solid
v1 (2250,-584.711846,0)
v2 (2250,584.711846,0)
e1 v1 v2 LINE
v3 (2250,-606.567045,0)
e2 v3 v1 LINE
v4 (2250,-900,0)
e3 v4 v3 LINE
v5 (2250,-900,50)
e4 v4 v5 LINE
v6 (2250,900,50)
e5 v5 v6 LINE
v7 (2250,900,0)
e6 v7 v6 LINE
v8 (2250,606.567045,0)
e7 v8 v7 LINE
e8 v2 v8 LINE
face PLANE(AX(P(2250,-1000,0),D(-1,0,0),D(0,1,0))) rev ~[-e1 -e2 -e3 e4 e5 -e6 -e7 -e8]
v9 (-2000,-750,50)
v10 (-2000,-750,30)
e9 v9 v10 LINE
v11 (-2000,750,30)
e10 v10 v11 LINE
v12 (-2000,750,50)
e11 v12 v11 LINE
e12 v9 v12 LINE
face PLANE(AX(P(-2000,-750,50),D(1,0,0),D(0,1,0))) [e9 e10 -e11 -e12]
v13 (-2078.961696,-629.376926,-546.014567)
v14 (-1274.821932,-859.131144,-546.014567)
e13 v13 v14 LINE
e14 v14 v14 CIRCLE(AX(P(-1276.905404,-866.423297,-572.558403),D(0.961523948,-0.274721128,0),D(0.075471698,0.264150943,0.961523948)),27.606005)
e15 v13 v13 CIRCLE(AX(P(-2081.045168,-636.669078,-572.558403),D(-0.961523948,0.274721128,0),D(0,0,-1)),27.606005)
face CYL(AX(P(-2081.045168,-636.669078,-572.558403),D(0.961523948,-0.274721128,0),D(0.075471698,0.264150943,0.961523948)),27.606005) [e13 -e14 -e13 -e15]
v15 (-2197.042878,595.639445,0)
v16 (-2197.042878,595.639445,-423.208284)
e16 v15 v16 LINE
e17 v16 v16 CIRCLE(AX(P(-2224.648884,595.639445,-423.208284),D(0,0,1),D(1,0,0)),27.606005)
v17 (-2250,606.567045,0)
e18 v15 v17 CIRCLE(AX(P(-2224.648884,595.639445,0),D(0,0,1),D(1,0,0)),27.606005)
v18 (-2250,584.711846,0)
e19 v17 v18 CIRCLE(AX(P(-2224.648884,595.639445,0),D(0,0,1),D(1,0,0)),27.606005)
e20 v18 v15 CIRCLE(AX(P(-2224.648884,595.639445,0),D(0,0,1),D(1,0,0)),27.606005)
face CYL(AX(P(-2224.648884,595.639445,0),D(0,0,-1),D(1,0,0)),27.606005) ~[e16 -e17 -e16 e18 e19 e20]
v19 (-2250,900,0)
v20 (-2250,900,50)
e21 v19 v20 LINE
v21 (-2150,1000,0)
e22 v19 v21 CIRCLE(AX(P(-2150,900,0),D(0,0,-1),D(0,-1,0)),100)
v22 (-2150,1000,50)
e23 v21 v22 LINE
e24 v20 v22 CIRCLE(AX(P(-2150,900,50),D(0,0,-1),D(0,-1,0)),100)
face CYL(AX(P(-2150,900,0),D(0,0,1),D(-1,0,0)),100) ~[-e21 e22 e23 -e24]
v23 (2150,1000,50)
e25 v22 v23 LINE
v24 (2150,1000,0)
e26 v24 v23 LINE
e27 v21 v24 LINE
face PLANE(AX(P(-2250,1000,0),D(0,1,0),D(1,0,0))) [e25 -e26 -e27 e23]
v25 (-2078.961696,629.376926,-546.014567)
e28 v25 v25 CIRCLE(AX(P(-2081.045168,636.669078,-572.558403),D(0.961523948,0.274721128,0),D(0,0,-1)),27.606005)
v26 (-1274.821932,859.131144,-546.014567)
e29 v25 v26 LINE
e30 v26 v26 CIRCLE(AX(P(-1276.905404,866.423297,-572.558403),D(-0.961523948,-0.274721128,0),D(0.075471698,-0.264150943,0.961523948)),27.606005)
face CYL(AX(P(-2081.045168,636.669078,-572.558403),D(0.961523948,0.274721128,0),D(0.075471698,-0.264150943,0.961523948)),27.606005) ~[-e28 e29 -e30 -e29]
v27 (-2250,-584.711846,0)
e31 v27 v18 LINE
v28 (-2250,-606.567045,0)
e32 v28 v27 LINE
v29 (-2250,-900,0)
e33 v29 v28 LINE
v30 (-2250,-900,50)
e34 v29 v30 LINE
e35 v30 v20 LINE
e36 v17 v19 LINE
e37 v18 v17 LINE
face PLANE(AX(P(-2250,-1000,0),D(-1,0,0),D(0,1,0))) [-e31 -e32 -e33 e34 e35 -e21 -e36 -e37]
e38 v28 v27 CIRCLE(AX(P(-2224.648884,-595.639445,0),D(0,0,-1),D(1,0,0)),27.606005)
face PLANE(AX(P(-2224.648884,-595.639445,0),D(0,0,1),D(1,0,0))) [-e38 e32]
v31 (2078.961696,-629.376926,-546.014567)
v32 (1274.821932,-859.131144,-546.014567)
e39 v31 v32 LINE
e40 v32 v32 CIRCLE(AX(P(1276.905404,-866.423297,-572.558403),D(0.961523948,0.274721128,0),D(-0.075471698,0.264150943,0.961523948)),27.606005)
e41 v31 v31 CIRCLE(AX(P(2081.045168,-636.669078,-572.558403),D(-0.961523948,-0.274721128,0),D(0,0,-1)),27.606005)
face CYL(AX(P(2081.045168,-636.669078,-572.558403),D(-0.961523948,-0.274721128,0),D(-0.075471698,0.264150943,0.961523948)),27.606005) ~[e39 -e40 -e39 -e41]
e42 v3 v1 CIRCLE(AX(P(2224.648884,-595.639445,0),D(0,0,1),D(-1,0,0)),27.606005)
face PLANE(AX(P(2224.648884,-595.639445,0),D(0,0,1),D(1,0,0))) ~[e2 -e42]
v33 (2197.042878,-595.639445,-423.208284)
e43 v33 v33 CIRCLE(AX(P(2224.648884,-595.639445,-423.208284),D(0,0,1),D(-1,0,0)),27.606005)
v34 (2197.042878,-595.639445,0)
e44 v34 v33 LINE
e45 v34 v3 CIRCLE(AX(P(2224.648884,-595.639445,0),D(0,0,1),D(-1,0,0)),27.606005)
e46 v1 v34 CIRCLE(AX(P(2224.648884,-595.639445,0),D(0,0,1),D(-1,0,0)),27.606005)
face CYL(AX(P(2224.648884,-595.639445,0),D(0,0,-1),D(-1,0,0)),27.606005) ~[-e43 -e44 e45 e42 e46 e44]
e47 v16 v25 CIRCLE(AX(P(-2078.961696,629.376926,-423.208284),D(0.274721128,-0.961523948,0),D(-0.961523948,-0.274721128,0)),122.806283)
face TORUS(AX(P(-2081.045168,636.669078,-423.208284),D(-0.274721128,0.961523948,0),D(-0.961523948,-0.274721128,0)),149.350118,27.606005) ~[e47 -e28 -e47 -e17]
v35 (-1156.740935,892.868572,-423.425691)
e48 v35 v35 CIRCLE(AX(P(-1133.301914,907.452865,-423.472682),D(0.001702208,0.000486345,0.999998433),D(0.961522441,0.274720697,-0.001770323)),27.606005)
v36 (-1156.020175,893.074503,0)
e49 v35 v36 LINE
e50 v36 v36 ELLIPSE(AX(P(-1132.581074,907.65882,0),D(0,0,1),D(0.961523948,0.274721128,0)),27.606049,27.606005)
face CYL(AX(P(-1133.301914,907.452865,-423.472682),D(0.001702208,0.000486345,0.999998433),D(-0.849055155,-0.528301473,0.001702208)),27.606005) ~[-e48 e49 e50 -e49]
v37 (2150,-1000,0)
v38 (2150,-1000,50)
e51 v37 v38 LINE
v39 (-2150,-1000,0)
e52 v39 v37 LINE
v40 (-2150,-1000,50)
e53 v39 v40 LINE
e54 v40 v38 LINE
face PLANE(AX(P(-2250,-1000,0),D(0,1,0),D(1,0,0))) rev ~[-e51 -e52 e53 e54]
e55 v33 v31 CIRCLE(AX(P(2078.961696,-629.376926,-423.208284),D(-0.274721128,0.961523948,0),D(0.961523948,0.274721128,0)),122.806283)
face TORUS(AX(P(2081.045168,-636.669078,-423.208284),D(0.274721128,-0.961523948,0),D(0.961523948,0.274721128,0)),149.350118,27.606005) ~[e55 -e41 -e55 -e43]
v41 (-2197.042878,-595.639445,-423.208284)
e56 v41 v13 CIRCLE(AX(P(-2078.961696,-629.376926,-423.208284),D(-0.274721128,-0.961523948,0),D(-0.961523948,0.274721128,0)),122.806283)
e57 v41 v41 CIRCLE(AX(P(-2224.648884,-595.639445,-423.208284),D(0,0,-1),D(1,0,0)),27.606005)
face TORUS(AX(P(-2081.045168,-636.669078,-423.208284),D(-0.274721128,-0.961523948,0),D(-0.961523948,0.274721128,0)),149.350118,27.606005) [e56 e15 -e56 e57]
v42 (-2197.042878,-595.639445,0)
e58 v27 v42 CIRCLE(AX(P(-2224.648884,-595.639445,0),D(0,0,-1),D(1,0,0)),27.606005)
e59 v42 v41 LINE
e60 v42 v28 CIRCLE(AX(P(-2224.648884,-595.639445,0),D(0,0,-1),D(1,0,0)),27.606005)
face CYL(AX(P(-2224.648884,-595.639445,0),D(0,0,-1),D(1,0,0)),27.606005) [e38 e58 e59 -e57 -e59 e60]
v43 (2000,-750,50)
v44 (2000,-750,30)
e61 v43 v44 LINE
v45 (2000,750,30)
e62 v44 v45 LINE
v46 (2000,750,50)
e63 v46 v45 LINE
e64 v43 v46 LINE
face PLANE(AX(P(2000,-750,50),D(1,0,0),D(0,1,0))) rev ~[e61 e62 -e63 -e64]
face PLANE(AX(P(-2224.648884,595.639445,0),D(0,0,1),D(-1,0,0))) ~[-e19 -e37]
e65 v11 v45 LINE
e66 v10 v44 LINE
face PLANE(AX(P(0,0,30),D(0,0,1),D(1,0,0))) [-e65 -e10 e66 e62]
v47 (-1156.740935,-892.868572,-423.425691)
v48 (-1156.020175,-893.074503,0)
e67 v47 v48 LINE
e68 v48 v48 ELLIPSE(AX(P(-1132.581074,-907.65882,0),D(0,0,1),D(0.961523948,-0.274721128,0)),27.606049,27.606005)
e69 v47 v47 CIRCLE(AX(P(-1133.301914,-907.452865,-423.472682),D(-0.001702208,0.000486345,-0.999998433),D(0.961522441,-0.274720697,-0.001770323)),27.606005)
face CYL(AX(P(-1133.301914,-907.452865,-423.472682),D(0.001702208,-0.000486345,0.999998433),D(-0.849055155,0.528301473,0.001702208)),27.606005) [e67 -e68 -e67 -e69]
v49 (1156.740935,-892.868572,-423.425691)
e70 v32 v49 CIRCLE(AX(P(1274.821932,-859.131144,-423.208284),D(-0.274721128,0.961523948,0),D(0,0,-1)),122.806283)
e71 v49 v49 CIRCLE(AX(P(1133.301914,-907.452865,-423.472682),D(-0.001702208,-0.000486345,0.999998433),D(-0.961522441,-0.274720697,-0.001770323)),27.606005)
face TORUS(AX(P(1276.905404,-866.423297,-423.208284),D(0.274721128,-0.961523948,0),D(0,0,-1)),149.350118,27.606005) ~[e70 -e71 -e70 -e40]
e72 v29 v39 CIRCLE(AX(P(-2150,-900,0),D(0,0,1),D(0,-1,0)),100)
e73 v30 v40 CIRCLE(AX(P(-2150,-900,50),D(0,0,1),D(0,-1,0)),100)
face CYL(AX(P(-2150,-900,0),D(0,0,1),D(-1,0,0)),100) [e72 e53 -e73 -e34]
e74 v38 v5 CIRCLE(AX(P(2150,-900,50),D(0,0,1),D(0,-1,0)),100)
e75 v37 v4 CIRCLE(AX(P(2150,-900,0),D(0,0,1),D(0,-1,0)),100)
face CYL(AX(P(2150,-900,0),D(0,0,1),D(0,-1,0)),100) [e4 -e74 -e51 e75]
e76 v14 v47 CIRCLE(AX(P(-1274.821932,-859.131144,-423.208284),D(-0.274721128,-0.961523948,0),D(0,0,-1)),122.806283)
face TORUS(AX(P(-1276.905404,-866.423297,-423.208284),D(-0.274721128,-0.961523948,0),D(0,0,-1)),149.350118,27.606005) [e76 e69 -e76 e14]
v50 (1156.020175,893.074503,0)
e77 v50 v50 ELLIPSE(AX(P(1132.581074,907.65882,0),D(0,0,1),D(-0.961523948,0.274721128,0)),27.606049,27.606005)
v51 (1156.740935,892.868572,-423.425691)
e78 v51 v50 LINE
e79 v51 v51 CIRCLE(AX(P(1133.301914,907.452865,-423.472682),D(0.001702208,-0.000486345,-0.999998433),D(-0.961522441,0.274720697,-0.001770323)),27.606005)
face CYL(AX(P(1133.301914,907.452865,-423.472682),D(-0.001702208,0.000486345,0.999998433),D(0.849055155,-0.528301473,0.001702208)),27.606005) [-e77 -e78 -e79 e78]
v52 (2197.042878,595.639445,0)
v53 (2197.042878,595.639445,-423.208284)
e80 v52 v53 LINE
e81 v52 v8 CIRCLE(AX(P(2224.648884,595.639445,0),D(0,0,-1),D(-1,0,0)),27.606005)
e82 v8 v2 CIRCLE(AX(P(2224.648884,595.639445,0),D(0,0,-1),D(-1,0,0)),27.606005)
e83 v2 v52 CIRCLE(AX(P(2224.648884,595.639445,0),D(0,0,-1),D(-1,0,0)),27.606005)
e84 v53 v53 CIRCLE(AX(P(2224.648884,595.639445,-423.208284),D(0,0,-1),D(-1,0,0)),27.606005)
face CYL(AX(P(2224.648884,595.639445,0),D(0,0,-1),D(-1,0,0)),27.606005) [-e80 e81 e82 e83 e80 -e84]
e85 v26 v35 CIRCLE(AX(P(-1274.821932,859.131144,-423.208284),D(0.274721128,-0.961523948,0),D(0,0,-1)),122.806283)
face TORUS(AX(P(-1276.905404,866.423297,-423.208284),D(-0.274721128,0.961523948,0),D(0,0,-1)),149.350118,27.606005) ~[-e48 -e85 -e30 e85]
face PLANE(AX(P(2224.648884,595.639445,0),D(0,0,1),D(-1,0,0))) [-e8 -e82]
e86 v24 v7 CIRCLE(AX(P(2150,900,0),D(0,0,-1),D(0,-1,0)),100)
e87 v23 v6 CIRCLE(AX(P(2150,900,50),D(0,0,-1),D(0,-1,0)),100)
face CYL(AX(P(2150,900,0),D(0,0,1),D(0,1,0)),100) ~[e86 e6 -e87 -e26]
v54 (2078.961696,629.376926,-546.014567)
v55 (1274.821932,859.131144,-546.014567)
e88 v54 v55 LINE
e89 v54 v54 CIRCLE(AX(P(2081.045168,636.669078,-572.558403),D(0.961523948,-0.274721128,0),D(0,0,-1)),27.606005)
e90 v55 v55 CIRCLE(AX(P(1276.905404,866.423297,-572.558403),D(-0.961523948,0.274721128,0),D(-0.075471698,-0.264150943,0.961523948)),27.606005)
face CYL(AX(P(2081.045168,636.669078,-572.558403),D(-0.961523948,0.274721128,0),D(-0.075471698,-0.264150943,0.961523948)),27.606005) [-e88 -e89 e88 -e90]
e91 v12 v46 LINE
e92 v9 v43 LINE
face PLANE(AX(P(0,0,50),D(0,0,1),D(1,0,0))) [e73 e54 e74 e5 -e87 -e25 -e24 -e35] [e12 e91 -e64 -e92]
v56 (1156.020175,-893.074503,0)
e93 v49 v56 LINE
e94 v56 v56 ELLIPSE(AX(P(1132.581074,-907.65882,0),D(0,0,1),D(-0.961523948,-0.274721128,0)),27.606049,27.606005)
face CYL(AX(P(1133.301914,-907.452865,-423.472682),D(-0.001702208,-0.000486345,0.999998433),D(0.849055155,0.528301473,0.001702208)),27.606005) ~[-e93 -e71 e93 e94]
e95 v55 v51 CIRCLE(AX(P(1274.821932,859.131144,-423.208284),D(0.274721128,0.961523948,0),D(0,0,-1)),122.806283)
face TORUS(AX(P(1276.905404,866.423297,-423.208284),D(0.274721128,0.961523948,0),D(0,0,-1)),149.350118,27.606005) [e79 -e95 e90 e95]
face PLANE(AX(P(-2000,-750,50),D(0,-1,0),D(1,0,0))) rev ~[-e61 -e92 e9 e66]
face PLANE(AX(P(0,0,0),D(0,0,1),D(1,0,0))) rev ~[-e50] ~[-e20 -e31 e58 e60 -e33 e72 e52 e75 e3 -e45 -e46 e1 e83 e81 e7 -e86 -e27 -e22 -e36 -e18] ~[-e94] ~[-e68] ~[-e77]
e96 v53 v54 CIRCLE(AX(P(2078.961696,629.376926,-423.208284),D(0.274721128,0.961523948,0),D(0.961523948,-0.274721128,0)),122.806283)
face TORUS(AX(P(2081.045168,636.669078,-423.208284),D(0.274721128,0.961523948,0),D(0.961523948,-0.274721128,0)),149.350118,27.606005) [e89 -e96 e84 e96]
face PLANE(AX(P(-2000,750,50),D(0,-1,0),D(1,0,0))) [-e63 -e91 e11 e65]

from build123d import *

# Parameters (mm, degrees)
F0_W              = 4500
F0_H              = 2000
F1_DEPTH          = 50
F2_W              = 4000
F2_H              = 1500
F3_DEPTH          = 20
F4_R              = 100
F9_R              = 27.6060053196
F10_COPIES2_COUNT = 2


# Not quite as in the source:
# - a feature of the source that left no trace in its solid (it failed there, or was rolled back) is left out
# - a pattern or mirror of a feature is missing from the dataset's text; its kind, count and spacing are read off the source's solid


with BuildPart() as f1:
    # F0 (on Top) → F1 (new body)
    with BuildSketch(Plane.XY):
        Rectangle(F0_W, F0_H)
    extrude(amount=F1_DEPTH)

    # F2 (on face) → F3 (cut)
    with BuildSketch(Plane.XY.offset(50)):
        Rectangle(F2_W, F2_H)
    extrude(amount=-F3_DEPTH, mode=Mode.SUBTRACT)

    # F4
    f4_edges = [f1.edges().sort_by_distance(p)[0] for p in [
        (-2250, -1000, 25),
        (2250, -1000, 25),
        (2250, 1000, 25),
        (-2250, 1000, 25),
    ]]
    fillet(f4_edges, radius=F4_R)

    # F10: sweep along a path in F8
    with BuildLine(Plane(origin=(-301.8867924528, -1056.6037735849, 0), x_dir=(-0.9615239476, 0.2747211279, 0), z_dir=(0.2747211279, 0.9615239476, 0))) as f10_path:
        Line((2026.0683182432, 0), (2026.0683182432, -423.2082843781))
        ThreePointArc((2026.0683182432, -423.2082843781), (1967.4896744805, -564.6296406154), (1826.0683182432, -623.2082843781))
        Line((1826.0683182432, -623.2082843781), (989.750339326, -623.2082843781))
        ThreePointArc((989.750339326, -623.2082843781), (848.4542193127, -564.754766034), (789.7506527308, -423.5623490699))
        Line((789.7506527308, -423.5623490699), (789.0008091927, 0))
    # F9 (on face) → F10 (sweep)
    with BuildSketch(Plane.XY):
        with Locations((-2224.6488836829, -595.6394452545)):
            Circle(F9_R)
    f10 = sweep(path=f10_path.line)

    # F10_copies: F10 across plane
    add(f10.mirror(Plane.ZX))

    # F10_copies1: F10 across plane
    add(f10.mirror(Plane(origin=(0, 0, 0), x_dir=(0, 0, 1), z_dir=(1, 0, 0))))

    # F10_copies2: F10 ×2 about axis
    f10_copies2_axis = Axis((0, 0, 0), (0, 0, 1))
    for i in range(1, F10_COPIES2_COUNT):
        add(f10.rotate(f10_copies2_axis, i * 360 / F10_COPIES2_COUNT))


solid = f1.part
